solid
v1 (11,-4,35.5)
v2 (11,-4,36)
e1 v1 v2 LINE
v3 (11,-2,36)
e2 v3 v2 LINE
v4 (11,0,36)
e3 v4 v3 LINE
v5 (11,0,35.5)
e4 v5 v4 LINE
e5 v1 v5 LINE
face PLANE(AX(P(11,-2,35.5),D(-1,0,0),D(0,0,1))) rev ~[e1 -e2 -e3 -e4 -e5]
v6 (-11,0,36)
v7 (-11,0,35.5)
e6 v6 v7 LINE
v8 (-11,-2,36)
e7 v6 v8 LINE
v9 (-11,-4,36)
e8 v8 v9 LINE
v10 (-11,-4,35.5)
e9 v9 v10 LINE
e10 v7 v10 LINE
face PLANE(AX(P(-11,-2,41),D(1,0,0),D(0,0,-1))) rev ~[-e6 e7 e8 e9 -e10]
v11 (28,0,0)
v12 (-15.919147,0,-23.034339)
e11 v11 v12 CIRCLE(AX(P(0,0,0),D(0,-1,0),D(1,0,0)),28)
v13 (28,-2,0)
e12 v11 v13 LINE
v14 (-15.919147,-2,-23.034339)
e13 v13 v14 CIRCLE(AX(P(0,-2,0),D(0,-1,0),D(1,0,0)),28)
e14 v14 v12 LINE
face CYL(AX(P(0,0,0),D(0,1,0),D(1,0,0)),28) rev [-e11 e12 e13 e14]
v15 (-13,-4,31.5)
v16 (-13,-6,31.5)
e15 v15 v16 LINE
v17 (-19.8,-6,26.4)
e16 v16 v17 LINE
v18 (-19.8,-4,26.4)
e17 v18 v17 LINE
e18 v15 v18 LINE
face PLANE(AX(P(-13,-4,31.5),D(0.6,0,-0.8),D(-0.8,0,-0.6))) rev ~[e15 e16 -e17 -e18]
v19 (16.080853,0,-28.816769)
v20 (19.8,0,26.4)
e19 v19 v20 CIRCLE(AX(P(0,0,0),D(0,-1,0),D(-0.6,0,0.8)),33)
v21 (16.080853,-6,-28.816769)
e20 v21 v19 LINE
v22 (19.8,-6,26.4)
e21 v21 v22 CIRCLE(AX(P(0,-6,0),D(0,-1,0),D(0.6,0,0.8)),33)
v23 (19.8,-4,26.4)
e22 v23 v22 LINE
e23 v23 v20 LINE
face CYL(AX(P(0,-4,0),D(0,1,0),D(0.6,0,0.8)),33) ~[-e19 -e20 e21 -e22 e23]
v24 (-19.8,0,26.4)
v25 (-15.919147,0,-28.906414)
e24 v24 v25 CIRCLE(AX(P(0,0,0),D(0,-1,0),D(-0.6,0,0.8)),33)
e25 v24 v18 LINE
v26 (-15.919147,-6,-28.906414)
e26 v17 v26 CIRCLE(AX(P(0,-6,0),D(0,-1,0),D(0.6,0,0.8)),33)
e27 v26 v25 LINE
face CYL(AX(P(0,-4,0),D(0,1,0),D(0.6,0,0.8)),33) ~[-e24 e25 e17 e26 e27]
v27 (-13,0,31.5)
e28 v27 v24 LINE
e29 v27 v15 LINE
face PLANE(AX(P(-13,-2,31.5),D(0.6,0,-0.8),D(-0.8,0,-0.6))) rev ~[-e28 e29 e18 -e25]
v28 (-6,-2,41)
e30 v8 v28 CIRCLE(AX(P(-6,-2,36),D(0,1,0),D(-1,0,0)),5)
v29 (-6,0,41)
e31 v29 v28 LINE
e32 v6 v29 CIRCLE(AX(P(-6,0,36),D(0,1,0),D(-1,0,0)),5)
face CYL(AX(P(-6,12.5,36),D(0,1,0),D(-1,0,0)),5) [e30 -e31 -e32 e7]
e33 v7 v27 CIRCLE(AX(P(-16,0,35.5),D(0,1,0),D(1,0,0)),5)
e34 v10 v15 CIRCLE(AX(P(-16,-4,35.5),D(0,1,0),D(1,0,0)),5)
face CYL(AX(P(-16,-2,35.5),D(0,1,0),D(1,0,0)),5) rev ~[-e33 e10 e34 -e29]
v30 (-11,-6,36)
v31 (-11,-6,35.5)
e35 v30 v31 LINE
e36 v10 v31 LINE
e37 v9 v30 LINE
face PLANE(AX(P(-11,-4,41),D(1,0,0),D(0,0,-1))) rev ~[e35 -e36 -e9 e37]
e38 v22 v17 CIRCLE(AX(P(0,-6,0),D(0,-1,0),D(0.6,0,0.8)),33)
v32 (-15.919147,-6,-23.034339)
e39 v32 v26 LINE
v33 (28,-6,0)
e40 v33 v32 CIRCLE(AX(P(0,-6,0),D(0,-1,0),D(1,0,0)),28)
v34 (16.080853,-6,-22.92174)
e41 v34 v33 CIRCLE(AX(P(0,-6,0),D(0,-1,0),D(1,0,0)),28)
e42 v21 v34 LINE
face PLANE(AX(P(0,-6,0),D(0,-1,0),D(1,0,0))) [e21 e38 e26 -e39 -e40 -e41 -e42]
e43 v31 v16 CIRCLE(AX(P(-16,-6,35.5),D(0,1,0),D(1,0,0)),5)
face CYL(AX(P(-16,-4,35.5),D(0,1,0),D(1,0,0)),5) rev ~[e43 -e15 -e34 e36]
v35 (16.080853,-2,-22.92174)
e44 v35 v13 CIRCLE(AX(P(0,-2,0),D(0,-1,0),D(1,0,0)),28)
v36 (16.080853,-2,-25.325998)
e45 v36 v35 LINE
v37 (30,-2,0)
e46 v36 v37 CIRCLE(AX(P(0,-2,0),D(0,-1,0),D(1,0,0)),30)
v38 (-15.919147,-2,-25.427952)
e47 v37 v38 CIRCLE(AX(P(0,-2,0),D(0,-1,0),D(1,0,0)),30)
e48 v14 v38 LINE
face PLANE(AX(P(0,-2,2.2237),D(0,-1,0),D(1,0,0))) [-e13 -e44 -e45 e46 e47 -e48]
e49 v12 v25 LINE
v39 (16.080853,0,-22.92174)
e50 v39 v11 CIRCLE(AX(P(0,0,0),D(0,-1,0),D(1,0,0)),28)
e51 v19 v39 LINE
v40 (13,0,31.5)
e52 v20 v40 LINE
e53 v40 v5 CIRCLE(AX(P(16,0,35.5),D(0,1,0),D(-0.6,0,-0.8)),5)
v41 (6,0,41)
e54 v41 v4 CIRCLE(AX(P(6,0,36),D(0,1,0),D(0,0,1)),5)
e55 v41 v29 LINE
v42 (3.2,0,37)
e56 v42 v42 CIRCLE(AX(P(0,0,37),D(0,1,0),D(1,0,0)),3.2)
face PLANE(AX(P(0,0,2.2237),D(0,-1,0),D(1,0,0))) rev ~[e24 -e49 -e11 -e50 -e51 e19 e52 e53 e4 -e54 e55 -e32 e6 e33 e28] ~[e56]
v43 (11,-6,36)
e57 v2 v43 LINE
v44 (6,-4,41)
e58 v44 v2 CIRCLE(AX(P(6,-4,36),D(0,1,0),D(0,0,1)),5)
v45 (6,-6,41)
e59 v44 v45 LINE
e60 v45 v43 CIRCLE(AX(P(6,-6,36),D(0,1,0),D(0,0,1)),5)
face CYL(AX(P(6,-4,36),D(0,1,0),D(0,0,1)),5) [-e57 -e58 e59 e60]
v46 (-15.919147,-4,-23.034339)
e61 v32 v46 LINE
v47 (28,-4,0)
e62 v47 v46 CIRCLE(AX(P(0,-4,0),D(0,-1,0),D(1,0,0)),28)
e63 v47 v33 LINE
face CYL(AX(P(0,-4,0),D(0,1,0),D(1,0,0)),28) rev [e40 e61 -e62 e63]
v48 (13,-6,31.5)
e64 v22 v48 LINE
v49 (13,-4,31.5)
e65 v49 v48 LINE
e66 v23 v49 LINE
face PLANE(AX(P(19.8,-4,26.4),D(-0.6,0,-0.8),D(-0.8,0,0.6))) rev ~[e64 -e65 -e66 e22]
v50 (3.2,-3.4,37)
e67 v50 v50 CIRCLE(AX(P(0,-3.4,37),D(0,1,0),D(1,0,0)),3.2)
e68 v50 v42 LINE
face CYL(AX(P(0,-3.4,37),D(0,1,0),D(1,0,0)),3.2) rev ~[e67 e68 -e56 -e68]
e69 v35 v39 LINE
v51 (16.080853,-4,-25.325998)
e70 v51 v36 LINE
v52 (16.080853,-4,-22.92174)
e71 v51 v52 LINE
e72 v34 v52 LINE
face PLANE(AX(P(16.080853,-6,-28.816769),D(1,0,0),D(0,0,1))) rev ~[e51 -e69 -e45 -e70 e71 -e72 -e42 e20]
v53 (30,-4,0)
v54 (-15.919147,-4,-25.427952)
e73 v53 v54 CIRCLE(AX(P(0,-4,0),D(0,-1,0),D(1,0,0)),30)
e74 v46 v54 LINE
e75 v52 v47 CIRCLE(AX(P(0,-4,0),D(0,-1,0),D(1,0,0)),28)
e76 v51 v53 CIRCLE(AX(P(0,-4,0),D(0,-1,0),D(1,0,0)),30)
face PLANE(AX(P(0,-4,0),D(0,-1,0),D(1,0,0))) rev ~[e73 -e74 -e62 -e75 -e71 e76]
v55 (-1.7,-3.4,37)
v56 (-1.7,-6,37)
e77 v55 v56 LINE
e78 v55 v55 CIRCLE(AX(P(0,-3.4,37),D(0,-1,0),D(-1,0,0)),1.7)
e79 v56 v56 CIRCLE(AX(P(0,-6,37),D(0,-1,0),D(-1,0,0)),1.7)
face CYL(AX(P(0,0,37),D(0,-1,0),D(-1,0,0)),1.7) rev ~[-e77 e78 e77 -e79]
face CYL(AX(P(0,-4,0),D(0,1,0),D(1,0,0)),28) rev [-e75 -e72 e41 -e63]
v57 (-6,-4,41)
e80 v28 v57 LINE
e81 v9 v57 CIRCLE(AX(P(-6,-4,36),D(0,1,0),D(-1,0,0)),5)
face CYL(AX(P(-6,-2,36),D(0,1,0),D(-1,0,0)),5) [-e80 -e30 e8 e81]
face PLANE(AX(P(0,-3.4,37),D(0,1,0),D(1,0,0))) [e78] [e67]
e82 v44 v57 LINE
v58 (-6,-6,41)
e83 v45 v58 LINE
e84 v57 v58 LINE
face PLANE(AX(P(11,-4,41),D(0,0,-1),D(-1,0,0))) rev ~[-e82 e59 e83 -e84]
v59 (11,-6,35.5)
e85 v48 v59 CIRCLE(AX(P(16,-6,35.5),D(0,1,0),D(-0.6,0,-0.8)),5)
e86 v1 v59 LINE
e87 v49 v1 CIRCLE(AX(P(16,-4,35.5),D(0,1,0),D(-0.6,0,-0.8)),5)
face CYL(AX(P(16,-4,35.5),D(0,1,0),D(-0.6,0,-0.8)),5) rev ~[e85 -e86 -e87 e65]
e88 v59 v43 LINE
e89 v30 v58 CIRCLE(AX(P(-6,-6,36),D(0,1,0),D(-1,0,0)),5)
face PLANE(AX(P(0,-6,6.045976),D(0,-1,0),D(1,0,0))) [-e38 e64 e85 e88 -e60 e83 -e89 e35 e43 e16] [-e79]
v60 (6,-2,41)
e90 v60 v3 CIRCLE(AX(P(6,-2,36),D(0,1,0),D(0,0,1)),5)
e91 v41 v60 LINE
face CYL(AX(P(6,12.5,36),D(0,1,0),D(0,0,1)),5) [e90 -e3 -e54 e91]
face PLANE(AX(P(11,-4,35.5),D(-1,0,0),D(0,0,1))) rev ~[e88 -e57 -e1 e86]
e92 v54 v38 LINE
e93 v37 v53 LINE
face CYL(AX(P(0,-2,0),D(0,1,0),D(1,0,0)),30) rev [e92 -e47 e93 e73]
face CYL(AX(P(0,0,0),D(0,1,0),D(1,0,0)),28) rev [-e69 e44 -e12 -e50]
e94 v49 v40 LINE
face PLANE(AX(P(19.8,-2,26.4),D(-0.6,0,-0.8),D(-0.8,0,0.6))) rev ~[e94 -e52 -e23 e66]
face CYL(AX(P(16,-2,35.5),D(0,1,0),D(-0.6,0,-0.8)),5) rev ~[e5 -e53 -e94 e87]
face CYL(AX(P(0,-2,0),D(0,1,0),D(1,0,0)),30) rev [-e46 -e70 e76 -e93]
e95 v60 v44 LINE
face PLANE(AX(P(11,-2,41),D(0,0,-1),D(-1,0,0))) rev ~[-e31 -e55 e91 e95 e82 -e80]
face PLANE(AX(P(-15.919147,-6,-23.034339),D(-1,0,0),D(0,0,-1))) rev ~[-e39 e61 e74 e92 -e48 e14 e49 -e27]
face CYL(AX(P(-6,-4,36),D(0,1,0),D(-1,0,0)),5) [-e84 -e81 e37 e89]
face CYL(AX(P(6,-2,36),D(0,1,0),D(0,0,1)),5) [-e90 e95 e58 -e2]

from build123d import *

# Parameters (mm, degrees)
F0_R            = 28
F1_DEPTH        = 2
F2_R            = 30
F2_R_2          = 1.5
F3_DEPTH        = 2
F4_R            = 30
F4_R_2          = 28
F5_DEPTH        = 2
F6_DEPTH        = 2
F7_T1_DEPTH     = 14.5
F7_T3_DEPTH     = 2
F7_T5_DEPTH     = 14.5
F8_T1_DEPTH     = 14.5
F8_T3_DEPTH     = 2
F8_T5_DEPTH     = 14.5
F10_DEPTH       = 6
F11_D           = 3.4
F11_CBORE_D     = 6.4
F11_CBORE_DEPTH = 3.4


# Not quite as in the source:
# - a fillet or chamfer that OpenCascade refuses, or shapes differently, is made with other operations: its cross-section is extruded or revolved along the edge and cut away or added


with BuildPart() as f1:
    # F0 (on Front) → F1 (new body)
    with BuildSketch(Plane.XZ):
        with BuildLine():
            ThreePointArc((-19.8, 26.4), (-14.7580486515, -29.516097303), (33, 0))
            ThreePointArc((33, 0), (29.516097303, 14.7580486515), (19.8, 26.4))
            ThreePointArc((19.8, 26.4), (10.4355162786, 31.3065488357), (0, 33))
            ThreePointArc((0, 33), (-10.4355162786, 31.3065488357), (-19.8, 26.4))
        make_face()
        Circle(F0_R, mode=Mode.SUBTRACT)
        with BuildLine():
            Line((-13, 31.5), (-19.8, 26.4))
            ThreePointArc((-19.8, 26.4), (-10.4355162786, 31.3065488357), (0, 33))
            Line((0, 33), (0, 35.5))
            ThreePointArc((0, 35.5), (-1.5, 37), (0, 38.5))
            Line((0, 38.5), (0, 41))
            Line((0, 41), (-11, 41))
            Line((-11, 41), (-11, 35.5))
            ThreePointArc((-11, 35.5), (-11.527864045, 33.2639320225), (-13, 31.5))
        make_face()
        with BuildLine():
            ThreePointArc((0, 33), (10.4355162786, 31.3065488357), (19.8, 26.4))
            Line((19.8, 26.4), (13, 31.5))
            ThreePointArc((13, 31.5), (11.527864045, 33.2639320225), (11, 35.5))
            Line((11, 35.5), (11, 41))
            Line((11, 41), (0, 41))
            Line((0, 41), (0, 38.5))
            ThreePointArc((0, 38.5), (1.0606601718, 38.0606601718), (1.5, 37))
            ThreePointArc((1.5, 37), (1.0606601718, 35.9393398282), (0, 35.5))
            Line((0, 35.5), (0, 33))
        make_face()
    extrude(amount=F1_DEPTH)

    # F2 (on face) → F3 (join)
    with BuildSketch(Plane.XZ.offset(2)):
        with BuildLine():
            Line((11, 41), (-11, 41))
            Line((-11, 41), (-11, 35.5))
            ThreePointArc((-11, 35.5), (-11.527864045, 33.2639320225), (-13, 31.5))
            Line((-13, 31.5), (-19.8, 26.4))
            ThreePointArc((-19.8, 26.4), (0, -33), (19.8, 26.4))
            Line((19.8, 26.4), (13, 31.5))
            ThreePointArc((13, 31.5), (11.527864045, 33.2639320225), (11, 35.5))
            Line((11, 35.5), (11, 41))
        make_face()
        Circle(F2_R, mode=Mode.SUBTRACT)
        with Locations((0, 37)):
            Circle(F2_R_2, mode=Mode.SUBTRACT)
    extrude(amount=F3_DEPTH)

    # F4 (on face) → F5 (join)
    with BuildSketch(Plane.XZ.offset(4)):
        with BuildLine():
            ThreePointArc((-19.8, 26.4), (-14.7580486515, -29.516097303), (33, 0))
            ThreePointArc((33, 0), (29.516097303, 14.7580486515), (19.8, 26.4))
            ThreePointArc((19.8, 26.4), (0, 33), (-19.8, 26.4))
        make_face()
        Circle(F4_R, mode=Mode.SUBTRACT)
        Circle(F4_R)
        Circle(F4_R_2, mode=Mode.SUBTRACT)
    extrude(amount=F5_DEPTH)

    # F6 (add): a face of the model
    f6_faces = [f1.faces().sort_by_distance(p)[0] for p in [
        (10.5779431318, -4, 38.25),
    ]]
    extrude(f6_faces, amount=F6_DEPTH)

    # F7: fillet of radius 5 on 3 edges, made by hand

    # F7_s2 → F7_t1 (cut)
    with BuildSketch(Plane.XZ.offset(-12.5)):
        with BuildLine():
            ThreePointArc((-11, 36), (-9.5355339059, 39.5355339059), (-6, 41))
            Line((-6, 41), (-11, 41))
            Line((-11, 41), (-11, 36))
        make_face()
    extrude(amount=F7_T1_DEPTH, mode=Mode.SUBTRACT)

    # F7_s4 → F7_t3 (cut)
    with BuildSketch(Plane.XZ.offset(2)):
        with BuildLine():
            ThreePointArc((-11, 36), (-9.5355339059, 39.5355339059), (-6, 41))
            Line((-6, 41), (-11, 41))
            Line((-11, 41), (-11, 36))
        make_face()
    extrude(amount=F7_T3_DEPTH, mode=Mode.SUBTRACT)

    # F7_s6 → F7_t5 (cut)
    with BuildSketch(Plane.XZ.offset(4)):
        with BuildLine():
            ThreePointArc((-11, 36), (-9.5355339059, 39.5355339059), (-6, 41))
            Line((-6, 41), (-11, 41))
            Line((-11, 41), (-11, 36))
        make_face()
    extrude(amount=F7_T5_DEPTH, mode=Mode.SUBTRACT)

    # F8: fillet of radius 5 on 3 edges, made by hand

    # F8_s2 → F8_t1 (cut)
    with BuildSketch(Plane.XZ.offset(-12.5)):
        with BuildLine():
            ThreePointArc((6, 41), (9.5355339059, 39.5355339059), (11, 36))
            Line((11, 36), (11, 41))
            Line((11, 41), (6, 41))
        make_face()
    extrude(amount=F8_T1_DEPTH, mode=Mode.SUBTRACT)

    # F8_s4 → F8_t3 (cut)
    with BuildSketch(Plane.XZ.offset(2)):
        with BuildLine():
            ThreePointArc((6, 41), (9.5355339059, 39.5355339059), (11, 36))
            Line((11, 36), (11, 41))
            Line((11, 41), (6, 41))
        make_face()
    extrude(amount=F8_T3_DEPTH, mode=Mode.SUBTRACT)

    # F8_s6 → F8_t5 (cut)
    with BuildSketch(Plane.XZ.offset(4)):
        with BuildLine():
            ThreePointArc((6, 41), (9.5355339059, 39.5355339059), (11, 36))
            Line((11, 36), (11, 41))
            Line((11, 41), (6, 41))
        make_face()
    extrude(amount=F8_T5_DEPTH, mode=Mode.SUBTRACT)

    # F9 (on face) → F10 (cut)
    with BuildSketch(Plane.XZ.offset(6)):
        with BuildLine():
            ThreePointArc((16.0808527693, -22.9217402091), (0.0985229196, -27.9998266644), (-15.9191472307, -23.0343385285))
            Line((-15.9191472307, -23.0343385285), (-15.9191472307, -28.9064136732))
            ThreePointArc((-15.9191472307, -28.9064136732), (0.0924457314, -32.9998705117), (16.0808527693, -28.8167689759))
            Line((16.0808527693, -28.8167689759), (16.0808527693, -22.9217402091))
        make_face()
    extrude(amount=-F10_DEPTH, mode=Mode.SUBTRACT)

    # F11 (through all)
    with Locations(Plane(origin=(0, 0, 0), x_dir=(1, 0, 0), z_dir=(0, 1, 0))):
        with Locations((0, -37)):
            CounterBoreHole(F11_D / 2, F11_CBORE_D / 2, F11_CBORE_DEPTH)


solid = f1.part
